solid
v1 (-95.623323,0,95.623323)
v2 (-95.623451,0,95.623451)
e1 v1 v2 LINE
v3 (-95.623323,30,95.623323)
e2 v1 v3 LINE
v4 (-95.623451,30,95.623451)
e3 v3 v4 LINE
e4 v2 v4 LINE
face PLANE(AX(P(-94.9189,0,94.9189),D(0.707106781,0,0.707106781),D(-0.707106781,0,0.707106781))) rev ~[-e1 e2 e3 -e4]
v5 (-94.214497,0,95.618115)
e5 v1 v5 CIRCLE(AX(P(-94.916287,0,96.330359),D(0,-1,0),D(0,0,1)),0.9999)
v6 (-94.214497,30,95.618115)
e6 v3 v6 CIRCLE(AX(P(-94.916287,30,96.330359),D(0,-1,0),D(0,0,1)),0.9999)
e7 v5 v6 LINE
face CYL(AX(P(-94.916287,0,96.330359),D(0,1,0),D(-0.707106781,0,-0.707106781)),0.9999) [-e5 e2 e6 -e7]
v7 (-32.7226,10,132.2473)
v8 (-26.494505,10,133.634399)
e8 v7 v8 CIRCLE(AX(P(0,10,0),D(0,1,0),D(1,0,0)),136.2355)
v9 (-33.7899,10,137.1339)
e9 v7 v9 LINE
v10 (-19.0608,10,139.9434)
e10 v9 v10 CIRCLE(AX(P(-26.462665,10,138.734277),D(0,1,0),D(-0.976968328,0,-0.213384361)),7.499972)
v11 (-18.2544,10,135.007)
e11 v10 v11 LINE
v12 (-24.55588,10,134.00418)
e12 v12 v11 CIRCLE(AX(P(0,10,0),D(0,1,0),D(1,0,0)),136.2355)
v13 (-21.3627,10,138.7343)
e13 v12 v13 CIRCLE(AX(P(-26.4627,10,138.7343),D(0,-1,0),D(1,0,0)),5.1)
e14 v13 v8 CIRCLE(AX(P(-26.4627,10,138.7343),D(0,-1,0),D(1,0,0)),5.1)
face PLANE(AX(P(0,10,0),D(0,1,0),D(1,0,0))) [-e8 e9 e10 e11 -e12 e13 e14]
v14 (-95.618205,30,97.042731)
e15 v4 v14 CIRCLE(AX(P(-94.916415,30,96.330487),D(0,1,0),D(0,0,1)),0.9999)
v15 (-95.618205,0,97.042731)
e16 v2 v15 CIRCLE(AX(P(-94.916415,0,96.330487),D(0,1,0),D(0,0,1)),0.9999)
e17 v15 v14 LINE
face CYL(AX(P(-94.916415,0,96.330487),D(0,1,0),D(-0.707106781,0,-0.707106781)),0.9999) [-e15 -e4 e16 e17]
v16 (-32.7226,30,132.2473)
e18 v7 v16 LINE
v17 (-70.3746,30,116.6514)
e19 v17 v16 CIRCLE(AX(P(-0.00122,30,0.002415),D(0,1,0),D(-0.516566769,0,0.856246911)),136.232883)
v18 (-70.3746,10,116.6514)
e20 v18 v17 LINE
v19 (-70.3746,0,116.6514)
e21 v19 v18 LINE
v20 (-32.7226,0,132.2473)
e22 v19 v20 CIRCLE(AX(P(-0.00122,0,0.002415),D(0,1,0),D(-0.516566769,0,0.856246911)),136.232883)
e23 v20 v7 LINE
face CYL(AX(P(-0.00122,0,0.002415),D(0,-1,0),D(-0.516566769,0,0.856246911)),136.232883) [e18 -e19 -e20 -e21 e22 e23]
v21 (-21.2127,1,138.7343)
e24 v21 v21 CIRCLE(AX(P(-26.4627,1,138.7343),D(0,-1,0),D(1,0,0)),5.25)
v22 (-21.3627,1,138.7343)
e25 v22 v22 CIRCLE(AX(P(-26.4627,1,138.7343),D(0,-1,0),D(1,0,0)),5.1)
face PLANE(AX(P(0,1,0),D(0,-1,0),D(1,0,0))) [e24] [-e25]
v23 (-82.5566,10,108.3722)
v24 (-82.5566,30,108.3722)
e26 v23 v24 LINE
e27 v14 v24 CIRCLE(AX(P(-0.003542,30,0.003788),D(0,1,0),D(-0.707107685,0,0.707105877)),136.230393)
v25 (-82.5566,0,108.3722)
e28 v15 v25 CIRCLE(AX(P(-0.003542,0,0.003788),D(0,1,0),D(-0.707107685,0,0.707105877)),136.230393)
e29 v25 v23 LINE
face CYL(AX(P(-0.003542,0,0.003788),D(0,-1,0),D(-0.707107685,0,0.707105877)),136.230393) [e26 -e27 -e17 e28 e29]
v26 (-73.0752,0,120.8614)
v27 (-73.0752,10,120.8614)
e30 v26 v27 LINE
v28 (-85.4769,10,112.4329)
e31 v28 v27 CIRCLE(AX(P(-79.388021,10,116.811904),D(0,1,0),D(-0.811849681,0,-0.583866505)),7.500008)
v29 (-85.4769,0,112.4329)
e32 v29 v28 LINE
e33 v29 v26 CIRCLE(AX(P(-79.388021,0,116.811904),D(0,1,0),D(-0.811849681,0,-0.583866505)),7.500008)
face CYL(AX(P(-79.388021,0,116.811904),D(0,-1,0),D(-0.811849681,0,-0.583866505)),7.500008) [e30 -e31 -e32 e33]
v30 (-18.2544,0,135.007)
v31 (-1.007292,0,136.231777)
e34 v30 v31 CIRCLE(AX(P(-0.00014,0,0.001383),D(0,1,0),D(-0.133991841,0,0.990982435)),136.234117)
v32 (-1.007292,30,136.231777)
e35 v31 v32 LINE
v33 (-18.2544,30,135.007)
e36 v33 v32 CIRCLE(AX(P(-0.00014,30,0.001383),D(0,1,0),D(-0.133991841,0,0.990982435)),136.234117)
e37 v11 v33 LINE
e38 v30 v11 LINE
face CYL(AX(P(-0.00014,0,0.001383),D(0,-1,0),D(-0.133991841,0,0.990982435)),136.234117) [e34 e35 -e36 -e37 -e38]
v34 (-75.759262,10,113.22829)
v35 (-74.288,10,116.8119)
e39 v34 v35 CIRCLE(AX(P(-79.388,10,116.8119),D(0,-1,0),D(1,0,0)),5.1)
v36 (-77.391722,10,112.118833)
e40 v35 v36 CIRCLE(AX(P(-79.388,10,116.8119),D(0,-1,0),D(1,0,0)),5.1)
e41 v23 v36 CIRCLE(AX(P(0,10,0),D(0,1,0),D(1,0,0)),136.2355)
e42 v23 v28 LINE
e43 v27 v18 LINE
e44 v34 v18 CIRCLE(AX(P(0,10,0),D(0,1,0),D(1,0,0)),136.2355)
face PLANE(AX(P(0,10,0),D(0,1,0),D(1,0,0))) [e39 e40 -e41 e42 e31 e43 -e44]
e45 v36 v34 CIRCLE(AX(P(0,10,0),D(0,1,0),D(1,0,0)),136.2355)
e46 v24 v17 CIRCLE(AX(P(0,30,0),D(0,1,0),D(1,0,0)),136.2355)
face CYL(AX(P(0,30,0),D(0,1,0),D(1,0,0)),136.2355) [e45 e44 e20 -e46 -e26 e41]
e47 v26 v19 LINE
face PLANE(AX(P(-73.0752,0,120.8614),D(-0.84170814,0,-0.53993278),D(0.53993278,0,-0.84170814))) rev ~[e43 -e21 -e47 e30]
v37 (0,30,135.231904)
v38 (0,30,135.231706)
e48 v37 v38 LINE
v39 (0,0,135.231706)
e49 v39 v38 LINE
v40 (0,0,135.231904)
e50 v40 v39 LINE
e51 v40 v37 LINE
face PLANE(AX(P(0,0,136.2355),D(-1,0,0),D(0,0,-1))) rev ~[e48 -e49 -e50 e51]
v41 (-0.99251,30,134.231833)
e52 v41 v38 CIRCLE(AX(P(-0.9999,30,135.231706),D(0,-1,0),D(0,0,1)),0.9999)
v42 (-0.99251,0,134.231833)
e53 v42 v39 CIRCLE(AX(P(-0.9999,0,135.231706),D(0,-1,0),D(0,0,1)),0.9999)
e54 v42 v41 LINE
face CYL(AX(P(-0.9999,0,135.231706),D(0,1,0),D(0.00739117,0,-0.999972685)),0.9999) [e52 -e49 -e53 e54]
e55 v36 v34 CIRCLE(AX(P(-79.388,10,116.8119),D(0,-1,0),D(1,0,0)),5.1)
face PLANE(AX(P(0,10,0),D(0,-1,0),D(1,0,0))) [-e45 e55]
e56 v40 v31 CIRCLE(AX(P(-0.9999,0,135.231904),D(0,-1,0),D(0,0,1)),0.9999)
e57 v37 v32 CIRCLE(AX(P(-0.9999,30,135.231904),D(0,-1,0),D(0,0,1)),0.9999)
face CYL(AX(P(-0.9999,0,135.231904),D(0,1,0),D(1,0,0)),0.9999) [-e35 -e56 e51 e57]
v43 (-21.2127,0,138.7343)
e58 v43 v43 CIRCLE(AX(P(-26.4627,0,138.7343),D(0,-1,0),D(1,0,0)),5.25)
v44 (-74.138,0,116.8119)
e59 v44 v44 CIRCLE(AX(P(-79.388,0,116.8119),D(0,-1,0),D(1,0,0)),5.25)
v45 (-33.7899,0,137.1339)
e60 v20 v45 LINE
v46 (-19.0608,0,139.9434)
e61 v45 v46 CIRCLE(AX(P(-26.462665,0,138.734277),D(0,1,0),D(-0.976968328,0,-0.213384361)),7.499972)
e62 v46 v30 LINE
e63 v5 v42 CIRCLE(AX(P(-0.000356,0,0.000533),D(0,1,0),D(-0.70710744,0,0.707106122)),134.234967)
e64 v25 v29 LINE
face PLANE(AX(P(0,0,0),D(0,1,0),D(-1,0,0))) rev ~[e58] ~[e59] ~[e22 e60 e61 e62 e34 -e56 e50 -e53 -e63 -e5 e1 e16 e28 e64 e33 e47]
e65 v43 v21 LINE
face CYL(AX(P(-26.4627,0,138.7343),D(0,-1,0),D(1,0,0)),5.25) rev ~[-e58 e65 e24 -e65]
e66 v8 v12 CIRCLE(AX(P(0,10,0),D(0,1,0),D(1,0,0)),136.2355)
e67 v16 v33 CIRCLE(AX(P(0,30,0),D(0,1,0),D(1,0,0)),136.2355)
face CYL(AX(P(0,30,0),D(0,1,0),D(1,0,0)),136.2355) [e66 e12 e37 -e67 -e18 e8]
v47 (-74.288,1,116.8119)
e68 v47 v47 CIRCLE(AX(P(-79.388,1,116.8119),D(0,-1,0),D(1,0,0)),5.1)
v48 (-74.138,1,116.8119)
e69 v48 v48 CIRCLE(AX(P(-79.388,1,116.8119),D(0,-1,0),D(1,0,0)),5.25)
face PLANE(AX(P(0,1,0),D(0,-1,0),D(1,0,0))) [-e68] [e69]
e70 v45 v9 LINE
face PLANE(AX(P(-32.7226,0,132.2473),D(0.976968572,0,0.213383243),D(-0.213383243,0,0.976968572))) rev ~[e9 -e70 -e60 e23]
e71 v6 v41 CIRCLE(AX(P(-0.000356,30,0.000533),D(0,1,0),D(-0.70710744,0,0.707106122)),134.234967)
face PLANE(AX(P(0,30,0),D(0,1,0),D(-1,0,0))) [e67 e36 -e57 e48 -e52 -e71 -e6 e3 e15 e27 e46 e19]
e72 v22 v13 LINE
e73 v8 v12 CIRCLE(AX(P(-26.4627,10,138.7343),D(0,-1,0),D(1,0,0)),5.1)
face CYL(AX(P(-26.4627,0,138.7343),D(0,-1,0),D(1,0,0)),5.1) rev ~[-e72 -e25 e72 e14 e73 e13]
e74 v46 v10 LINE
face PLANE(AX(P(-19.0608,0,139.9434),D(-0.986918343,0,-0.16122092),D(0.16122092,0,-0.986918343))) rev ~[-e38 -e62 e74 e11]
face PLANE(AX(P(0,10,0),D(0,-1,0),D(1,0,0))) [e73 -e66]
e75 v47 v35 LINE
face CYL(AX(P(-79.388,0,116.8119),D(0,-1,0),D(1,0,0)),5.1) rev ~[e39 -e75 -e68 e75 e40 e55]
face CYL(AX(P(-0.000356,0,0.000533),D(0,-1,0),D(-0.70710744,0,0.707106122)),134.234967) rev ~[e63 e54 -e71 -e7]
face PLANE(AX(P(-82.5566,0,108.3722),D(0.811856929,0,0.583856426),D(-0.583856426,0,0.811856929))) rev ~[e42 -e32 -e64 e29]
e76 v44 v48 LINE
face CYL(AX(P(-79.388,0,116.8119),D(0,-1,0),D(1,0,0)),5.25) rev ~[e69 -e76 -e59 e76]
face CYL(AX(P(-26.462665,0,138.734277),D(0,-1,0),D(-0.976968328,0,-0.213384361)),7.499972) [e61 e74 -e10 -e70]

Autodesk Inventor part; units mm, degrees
ref_plane "YZ Plane" through (0, 0, 0) normal (1, 0, 0) x (0, 1, 0)
ref_plane "XZ Plane" through (0, 0, 0) normal (0, 1, 0) x (-1, 0, 0)
ref_plane "XY Plane" through (0, 0, 0) normal (0, 0, 1) x (1, 0, 0)
sketch "Sketch1" plane through (0, 0, 0) normal (0, 1, 0) x (-1, 0, 0)
  circle A0 centre (26.4627, 138.7343) radius 5
  circle A1 centre (79.388, 116.8119) radius 5
  arc A2 (96.3331, 96.3331) -> (82.5566, 108.3722) centre (0, 0) ccw
  line L0 (82.5566, 108.3722) -> (85.4769, 112.4329)
  arc A3 (85.4769, 112.4329) -> (73.0752, 120.8614) centre (79.388, 116.8119) ccw
  line L1 (73.0752, 120.8614) -> (70.3746, 116.6514)
  arc A4 (70.3746, 116.6514) -> (32.7226, 132.2473) centre (0, 0) ccw
  line L2 (32.7226, 132.2473) -> (33.7899, 137.1339)
  arc A5 (33.7899, 137.1339) -> (19.0608, 139.9434) centre (26.4627, 138.7343) ccw
  line L3 (19.0608, 139.9434) -> (18.2544, 135.007)
  arc A6 (18.2544, 135.007) -> (0, 136.2355) centre (0, 0) ccw
  line L4 (0, 136.2355) -> (0, 134.2355)
  arc A7 (94.9189, 94.9189) -> (0, 134.2355) centre (0, 0) ccw
  line L5 (94.9189, 94.9189) -> (96.3331, 96.3331)
extrude "Extrusion1" add sketch "Sketch1" along normal blind 30 contours A0 | A1 | L5 A7 L4 A6 L3 A5 L2 A4 L1 A3 L0 A2
sketch "Sketch2" plane through (0, 30, 0) normal (0, 1, 0) x (1, 0, 0)
  arc A0 (-96.3331, -96.3331) -> (-82.5566, -108.3722) centre (0, 0) ccw projected
  line L0 (-82.5566, -108.3722) -> (-85.4769, -112.4329) projected
  arc A1 (-85.4769, -112.4329) -> (-73.0752, -120.8614) centre (-79.388, -116.8119) ccw projected
  line L1 (-73.0752, -120.8614) -> (-70.3746, -116.6514) projected
  arc A2 (-70.3746, -116.6514) -> (-32.7226, -132.2473) centre (0, 0) ccw projected
  line L2 (-32.7226, -132.2473) -> (-33.7899, -137.1339) projected
  arc A3 (-33.7899, -137.1339) -> (-19.0608, -139.9434) centre (-26.4627, -138.7343) ccw projected
  line L3 (-19.0608, -139.9434) -> (-18.2544, -135.007) projected
  arc A4 (-18.2544, -135.007) -> (0, -136.2355) centre (0, 0) ccw projected
  line L4 (0, -136.2355) -> (0, -134.2355) projected
  arc A5 (-94.9189, -94.9189) -> (0, -134.2355) centre (0, 0) ccw projected
  line L5 (-94.9189, -94.9189) -> (-96.3331, -96.3331) projected
  circle A6 centre (0, 0) radius 136.2355
  point P0 (0, 0)
  point P1 (-82.5566, -108.3722)
extrude "Extrusion2" cut sketch "Sketch2" against normal blind 20 contours A6 L1 A1 L0 | A6 L3 A3 L2
sketch "Sketch3" plane through (0, 0, 0) normal (0, -1, 0) x (1, 0, 0)
  arc A0 (-82.5566, 108.3722) -> (-96.3331, 96.3331) centre (0, 0) ccw projected
  line L0 (-94.9189, 94.9189) -> (-96.3331, 96.3331) projected
  arc A1 (0, 134.2355) -> (-94.9189, 94.9189) centre (0, 0) ccw projected
  line L1 (0, 136.2355) -> (0, 134.2355) projected
  arc A2 (0, 136.2355) -> (-18.2544, 135.007) centre (0, 0) ccw projected
  line L2 (-19.0608, 139.9434) -> (-18.2544, 135.007) projected
  arc A3 (-19.0608, 139.9434) -> (-33.7899, 137.1339) centre (-26.4627, 138.7343) ccw projected
  line L3 (-32.7226, 132.2473) -> (-33.7899, 137.1339) projected
  arc A4 (-32.7226, 132.2473) -> (-70.3746, 116.6514) centre (0, 0) ccw projected
  line L4 (-73.0752, 120.8614) -> (-70.3746, 116.6514) projected
  arc A5 (-73.0752, 120.8614) -> (-85.4769, 112.4329) centre (-79.388, 116.8119) ccw projected
  line L5 (-82.5566, 108.3722) -> (-85.4769, 112.4329) projected
  circle A6 centre (-26.4627, 138.7343) radius 5.1
  circle A7 centre (-79.388, 116.8119) radius 5.1
  point P0 (0, 0)
  dimension "d7" = 10.2
  dimension "d8" = 10.2
extrude "Extrusion3" cut sketch "Sketch3" against normal blind 10 contours A6 | A7
fillet "Fillet1" radius 1 4 edges at (0, 15, 136.2355) (0, 15, 134.2355) (-96.3331, 15, 96.3331) (-94.9189, 15, 94.9189)
sketch "Sketch4" plane through (0, 0, 0) normal (0, -1, 0) x (1, 0, 0)
  circle A0 centre (-26.4627, 138.7343) radius 5.1 projected
  circle A1 centre (-26.4627, 138.7343) radius 5.25
  circle A2 centre (-79.388, 116.8119) radius 5.1 projected
  circle A3 centre (-79.388, 116.8119) radius 5.25
  point P0 (0, 0)
  dimension "d12" = 10.5
  dimension "d15" = 10.5
extrude "Extrusion4" cut sketch "Sketch4" against normal blind 1 contours A1 | A2 | A3
properties part number "wall_standard"
